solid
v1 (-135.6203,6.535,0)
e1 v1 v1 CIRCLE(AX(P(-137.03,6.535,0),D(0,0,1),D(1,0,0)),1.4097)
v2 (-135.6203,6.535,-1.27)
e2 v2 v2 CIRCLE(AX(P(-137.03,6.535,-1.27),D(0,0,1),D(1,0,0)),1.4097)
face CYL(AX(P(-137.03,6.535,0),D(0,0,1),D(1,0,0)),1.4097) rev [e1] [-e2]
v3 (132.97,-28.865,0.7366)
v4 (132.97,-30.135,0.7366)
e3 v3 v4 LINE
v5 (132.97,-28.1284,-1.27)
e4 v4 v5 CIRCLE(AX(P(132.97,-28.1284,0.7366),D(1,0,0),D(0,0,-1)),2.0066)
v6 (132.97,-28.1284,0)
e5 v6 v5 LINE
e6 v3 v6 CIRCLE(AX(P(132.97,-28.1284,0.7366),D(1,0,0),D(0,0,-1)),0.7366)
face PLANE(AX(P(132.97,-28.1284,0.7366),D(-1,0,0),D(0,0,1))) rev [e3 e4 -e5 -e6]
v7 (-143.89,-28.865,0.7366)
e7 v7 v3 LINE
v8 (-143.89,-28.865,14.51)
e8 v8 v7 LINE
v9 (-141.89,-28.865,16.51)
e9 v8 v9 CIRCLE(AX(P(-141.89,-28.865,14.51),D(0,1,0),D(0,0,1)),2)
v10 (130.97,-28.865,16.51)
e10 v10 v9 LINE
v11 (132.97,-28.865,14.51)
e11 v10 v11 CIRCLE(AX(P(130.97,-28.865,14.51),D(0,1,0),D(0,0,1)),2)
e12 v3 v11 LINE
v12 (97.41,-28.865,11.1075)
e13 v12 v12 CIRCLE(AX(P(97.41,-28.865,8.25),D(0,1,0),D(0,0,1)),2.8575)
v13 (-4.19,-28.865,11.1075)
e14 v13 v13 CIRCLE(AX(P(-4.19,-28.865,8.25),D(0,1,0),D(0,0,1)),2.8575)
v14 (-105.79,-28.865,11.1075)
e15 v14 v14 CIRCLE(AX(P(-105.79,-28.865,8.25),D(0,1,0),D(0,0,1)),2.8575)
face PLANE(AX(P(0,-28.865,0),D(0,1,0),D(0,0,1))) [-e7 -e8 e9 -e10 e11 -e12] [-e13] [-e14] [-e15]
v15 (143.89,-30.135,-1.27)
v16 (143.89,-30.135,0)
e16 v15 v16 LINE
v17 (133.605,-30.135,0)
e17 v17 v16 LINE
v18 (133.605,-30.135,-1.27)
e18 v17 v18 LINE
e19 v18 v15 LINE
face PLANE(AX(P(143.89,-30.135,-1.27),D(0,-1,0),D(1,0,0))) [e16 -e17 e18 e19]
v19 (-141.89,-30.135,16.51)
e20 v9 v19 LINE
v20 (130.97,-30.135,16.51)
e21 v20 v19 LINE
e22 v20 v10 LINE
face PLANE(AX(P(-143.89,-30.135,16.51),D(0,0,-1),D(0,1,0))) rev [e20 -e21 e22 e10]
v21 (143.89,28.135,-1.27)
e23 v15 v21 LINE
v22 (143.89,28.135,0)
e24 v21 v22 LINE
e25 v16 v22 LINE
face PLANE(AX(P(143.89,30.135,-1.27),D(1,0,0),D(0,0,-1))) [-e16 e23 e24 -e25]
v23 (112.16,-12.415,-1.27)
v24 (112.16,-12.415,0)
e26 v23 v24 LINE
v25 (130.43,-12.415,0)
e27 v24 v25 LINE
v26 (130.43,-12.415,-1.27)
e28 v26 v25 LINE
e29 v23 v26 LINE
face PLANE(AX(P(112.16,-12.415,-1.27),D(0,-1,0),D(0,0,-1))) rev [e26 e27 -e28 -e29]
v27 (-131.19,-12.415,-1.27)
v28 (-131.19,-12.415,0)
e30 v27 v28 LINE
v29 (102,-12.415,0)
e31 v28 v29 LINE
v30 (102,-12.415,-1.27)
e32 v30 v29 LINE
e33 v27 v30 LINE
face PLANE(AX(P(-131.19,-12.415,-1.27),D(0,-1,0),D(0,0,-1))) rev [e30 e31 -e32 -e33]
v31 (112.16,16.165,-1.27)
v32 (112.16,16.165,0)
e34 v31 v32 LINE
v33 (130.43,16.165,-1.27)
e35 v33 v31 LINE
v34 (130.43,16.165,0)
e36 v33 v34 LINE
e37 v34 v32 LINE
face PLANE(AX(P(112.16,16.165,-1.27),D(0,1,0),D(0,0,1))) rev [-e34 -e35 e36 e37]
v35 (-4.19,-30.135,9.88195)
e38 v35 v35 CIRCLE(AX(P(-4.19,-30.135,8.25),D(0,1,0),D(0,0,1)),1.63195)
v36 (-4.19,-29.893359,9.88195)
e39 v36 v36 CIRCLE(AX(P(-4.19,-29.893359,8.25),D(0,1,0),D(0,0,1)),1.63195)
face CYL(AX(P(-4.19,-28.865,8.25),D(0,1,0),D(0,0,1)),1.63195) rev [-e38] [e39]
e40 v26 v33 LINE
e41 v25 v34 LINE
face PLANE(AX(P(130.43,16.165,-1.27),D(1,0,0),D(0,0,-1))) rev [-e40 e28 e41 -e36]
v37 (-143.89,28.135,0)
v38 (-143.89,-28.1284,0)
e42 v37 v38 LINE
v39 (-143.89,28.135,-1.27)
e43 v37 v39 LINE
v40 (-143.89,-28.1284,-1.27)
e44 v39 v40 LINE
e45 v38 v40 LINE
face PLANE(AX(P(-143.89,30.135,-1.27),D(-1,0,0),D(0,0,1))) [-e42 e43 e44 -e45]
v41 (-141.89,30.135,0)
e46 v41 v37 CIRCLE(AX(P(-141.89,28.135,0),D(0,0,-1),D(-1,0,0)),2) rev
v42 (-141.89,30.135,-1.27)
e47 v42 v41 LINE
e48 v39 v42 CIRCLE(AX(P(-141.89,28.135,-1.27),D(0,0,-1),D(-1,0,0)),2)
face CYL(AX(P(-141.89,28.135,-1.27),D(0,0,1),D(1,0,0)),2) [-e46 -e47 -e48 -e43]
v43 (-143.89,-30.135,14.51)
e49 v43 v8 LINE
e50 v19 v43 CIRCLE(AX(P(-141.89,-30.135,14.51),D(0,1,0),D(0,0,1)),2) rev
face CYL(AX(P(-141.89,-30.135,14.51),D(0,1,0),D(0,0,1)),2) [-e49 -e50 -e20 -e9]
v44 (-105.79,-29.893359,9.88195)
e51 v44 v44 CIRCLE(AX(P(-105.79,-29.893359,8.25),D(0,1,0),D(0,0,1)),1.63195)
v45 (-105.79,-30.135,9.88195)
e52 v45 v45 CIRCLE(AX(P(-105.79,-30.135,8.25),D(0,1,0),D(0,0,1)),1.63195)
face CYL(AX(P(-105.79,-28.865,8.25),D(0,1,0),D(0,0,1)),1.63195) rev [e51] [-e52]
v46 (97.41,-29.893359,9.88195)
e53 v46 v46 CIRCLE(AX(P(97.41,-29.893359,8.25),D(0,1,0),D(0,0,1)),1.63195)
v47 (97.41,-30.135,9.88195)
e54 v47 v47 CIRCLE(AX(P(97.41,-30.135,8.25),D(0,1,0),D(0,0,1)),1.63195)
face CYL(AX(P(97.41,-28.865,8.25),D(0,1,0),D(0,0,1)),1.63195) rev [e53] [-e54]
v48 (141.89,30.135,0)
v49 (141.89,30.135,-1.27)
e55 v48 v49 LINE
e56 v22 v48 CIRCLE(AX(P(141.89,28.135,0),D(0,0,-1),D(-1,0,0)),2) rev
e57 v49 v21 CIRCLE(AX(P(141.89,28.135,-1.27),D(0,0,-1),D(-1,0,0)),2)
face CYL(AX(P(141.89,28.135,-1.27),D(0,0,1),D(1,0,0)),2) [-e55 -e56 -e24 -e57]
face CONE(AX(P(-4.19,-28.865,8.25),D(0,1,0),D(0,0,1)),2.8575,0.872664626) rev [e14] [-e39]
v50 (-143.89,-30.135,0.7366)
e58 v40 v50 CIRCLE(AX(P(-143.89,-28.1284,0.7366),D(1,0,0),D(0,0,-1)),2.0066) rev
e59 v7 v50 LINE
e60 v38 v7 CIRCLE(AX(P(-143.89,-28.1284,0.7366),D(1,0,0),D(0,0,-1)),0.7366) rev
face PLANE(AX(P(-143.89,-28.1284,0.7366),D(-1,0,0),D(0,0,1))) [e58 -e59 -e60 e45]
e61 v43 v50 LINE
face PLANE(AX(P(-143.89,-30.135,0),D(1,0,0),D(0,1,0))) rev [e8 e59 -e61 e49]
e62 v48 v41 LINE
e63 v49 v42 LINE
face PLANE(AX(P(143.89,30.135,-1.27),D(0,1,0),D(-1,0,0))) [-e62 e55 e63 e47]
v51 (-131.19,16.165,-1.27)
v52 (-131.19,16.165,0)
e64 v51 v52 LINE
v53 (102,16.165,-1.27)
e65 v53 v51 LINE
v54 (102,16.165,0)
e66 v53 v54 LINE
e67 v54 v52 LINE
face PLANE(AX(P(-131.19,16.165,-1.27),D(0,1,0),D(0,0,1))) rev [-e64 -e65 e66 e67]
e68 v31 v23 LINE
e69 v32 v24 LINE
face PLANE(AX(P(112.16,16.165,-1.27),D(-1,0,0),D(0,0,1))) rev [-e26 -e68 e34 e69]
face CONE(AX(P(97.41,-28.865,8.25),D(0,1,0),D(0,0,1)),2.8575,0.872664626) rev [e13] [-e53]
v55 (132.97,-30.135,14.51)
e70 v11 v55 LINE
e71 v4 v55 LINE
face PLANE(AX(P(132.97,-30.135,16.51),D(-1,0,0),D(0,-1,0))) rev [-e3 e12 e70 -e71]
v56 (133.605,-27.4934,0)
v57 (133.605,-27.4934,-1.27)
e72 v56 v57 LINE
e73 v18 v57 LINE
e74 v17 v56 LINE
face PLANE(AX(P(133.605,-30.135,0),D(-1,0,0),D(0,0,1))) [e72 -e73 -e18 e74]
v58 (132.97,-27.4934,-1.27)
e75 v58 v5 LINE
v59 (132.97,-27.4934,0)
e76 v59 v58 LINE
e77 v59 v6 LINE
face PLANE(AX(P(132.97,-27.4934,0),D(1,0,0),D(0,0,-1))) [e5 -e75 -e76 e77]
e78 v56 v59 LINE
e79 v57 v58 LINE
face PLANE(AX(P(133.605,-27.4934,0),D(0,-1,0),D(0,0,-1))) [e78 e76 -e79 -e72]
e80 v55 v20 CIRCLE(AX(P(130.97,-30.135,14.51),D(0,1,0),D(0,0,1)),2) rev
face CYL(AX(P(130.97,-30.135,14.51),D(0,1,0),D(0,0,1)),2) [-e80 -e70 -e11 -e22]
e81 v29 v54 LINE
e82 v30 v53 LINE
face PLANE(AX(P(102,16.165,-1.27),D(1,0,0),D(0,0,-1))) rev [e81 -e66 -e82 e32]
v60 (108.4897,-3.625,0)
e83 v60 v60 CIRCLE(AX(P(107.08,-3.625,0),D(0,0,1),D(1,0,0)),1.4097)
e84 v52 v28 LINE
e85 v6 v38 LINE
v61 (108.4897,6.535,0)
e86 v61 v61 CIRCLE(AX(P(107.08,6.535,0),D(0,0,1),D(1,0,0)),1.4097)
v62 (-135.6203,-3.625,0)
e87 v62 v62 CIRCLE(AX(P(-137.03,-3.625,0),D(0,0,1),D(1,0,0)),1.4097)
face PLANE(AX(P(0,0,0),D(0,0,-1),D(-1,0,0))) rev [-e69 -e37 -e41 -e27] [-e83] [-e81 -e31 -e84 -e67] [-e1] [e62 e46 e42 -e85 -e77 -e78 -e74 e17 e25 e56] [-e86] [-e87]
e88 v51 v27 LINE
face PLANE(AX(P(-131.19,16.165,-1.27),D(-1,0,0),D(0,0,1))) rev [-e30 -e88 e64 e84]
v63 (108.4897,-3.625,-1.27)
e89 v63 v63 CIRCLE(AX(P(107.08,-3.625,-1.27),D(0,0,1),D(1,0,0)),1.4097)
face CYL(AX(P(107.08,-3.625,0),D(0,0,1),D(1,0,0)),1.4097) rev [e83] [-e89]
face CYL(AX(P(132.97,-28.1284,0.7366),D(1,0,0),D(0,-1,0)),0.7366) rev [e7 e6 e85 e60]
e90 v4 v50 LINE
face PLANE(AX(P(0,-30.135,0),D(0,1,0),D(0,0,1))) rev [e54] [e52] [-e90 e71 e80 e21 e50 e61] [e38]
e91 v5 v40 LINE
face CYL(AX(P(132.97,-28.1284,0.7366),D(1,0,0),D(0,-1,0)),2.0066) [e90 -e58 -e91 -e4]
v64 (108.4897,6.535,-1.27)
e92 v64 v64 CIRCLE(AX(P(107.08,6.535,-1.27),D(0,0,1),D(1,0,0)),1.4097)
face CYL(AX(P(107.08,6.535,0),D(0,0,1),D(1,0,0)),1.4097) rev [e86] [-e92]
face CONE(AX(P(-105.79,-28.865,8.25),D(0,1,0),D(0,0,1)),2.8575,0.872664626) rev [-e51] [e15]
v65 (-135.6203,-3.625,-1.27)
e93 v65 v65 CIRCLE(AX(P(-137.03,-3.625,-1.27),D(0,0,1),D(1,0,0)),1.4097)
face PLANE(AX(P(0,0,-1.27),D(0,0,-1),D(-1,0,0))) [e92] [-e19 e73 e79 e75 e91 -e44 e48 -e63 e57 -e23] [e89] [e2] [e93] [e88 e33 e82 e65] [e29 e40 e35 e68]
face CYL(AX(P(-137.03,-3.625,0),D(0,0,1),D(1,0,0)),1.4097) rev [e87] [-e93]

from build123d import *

# Parameters (mm, degrees)
SKETCH2_W                     = 287.78
SKETCH2_H                     = 60.27
SKETCH2_W_2                   = 233.19
SKETCH2_H_2                   = 28.58
SKETCH2_W_3                   = 18.27
BASE_FLANGE1_DEPTH            = 1.27
EDGE_FLANGE1_STRIP_W          = 6.5532
EDGE_FLANGE1_STRIP_H          = 1.27
EDGE_FLANGE1_STRIP_CUT_DEPTH  = 276.86
EDGE_FLANGE1_RELIEF_W         = 7.1882
EDGE_FLANGE1_RELIEF_H         = 0.635
EDGE_FLANGE1_RELIEF_CUT_DEPTH = 1.27
EDGE_FLANGE1_DEPTH            = 276.86
F_34_0_111_DIAMETER_HOLE1_D   = 2.8194
LPATTERN1_COUNT               = 3
LPATTERN1_PITCH               = 101.6
FILLET1_R                     = 2


# Sheet-metal steps are written as plain solids
with BuildPart() as part:
    # Sketch2 → Base-Flange1 (new body)
    with BuildSketch(Plane.XY):
        Rectangle(SKETCH2_W, SKETCH2_H)
        with Locations((-14.595, 1.875)):
            Rectangle(SKETCH2_W_2, SKETCH2_H_2, mode=Mode.SUBTRACT)
        with Locations((121.295, 1.875)):
            Rectangle(SKETCH2_W_3, SKETCH2_H_2, mode=Mode.SUBTRACT)
    extrude(amount=-BASE_FLANGE1_DEPTH)

    # Edge-Flange1 strip (across the edge) → Edge-Flange1 strip cut (cut)
    with BuildSketch(Plane(origin=(-143.89, -30.135, 0), x_dir=(0, 1, 0), z_dir=(1, 0, 0))):
        with Locations((-1.27, -0.635)):
            Rectangle(EDGE_FLANGE1_STRIP_W, EDGE_FLANGE1_STRIP_H)
    extrude(amount=EDGE_FLANGE1_STRIP_CUT_DEPTH, mode=Mode.SUBTRACT)

    # Edge-Flange1 relief (on the sheet) → Edge-Flange1 relief cut (cut)
    with BuildSketch(Plane(origin=(-143.89, -28.1284, 0), x_dir=(0, 1, 0), z_dir=(0, 0, 1))):
        with Locations((-2.9591, -277.1775)):
            Rectangle(EDGE_FLANGE1_RELIEF_W, EDGE_FLANGE1_RELIEF_H)
    extrude(amount=-EDGE_FLANGE1_RELIEF_CUT_DEPTH, mode=Mode.SUBTRACT)

    # Edge-Flange1 section (across the edge) → Edge-Flange1 (add)
    with BuildSketch(Plane(origin=(-143.89, -30.135, 0), x_dir=(0, 1, 0), z_dir=(1, 0, 0))):
        with BuildLine():
            Line((0, 0.7366), (0, 16.51))
            Line((0, 16.51), (1.27, 16.51))
            Line((1.27, 16.51), (1.27, 0.7366))
            ThreePointArc((1.27, 0.7366), (1.485745145, 0.215745145), (2.0066, 0))
            Line((2.0066, 0), (2.0066, -1.27))
            ThreePointArc((2.0066, -1.27), (0.587719533, -0.682280467), (0, 0.7366))
        make_face()
    extrude(amount=EDGE_FLANGE1_DEPTH)

    # #34 (0.111) Diameter Hole1 (through all)
    with Locations(Plane.XY):
        with Locations((-137.03, 6.535), (-137.03, -3.625), (107.08, 6.535), (107.08, -3.625)):
            Hole(F_34_0_111_DIAMETER_HOLE1_D / 2)

    # Sketch13 → CSK for #4 Flat Head Machine Screw (100)1 (revolve, cut)
    with BuildSketch(Plane(origin=(97.41, -28.865, 8.25), x_dir=(0, 0, 1), z_dir=(1, 0, 0))):
        Polygon((0, 0), (0, 1.27), (1.63195, 1.27), (1.63195, 1.028358553), (2.8575, 0), align=None)
    csk_for_4_flat_head_machine_screw_100 = revolve(axis=Axis((97.41, -22.515, 8.25), (0, -1, 0)), mode=Mode.SUBTRACT)

    # LPattern1: CSK for #4 Flat Head Machine Screw (100)1 ×3
    with Locations(*[(-i * LPATTERN1_PITCH, 0, 0) for i in range(1, LPATTERN1_COUNT)]):
        add(csk_for_4_flat_head_machine_screw_100, mode=Mode.SUBTRACT)

    # Fillet1
    fillet1_edges = [part.edges().sort_by_distance(p)[0] for p in [
        (-143.89, -29.5, 16.51),
        (132.97, -29.5, 16.51),
        (-143.89, 30.135, -0.635),
        (143.89, 30.135, -0.635),
    ]]
    fillet(fillet1_edges, radius=FILLET1_R)


solid = part.part
